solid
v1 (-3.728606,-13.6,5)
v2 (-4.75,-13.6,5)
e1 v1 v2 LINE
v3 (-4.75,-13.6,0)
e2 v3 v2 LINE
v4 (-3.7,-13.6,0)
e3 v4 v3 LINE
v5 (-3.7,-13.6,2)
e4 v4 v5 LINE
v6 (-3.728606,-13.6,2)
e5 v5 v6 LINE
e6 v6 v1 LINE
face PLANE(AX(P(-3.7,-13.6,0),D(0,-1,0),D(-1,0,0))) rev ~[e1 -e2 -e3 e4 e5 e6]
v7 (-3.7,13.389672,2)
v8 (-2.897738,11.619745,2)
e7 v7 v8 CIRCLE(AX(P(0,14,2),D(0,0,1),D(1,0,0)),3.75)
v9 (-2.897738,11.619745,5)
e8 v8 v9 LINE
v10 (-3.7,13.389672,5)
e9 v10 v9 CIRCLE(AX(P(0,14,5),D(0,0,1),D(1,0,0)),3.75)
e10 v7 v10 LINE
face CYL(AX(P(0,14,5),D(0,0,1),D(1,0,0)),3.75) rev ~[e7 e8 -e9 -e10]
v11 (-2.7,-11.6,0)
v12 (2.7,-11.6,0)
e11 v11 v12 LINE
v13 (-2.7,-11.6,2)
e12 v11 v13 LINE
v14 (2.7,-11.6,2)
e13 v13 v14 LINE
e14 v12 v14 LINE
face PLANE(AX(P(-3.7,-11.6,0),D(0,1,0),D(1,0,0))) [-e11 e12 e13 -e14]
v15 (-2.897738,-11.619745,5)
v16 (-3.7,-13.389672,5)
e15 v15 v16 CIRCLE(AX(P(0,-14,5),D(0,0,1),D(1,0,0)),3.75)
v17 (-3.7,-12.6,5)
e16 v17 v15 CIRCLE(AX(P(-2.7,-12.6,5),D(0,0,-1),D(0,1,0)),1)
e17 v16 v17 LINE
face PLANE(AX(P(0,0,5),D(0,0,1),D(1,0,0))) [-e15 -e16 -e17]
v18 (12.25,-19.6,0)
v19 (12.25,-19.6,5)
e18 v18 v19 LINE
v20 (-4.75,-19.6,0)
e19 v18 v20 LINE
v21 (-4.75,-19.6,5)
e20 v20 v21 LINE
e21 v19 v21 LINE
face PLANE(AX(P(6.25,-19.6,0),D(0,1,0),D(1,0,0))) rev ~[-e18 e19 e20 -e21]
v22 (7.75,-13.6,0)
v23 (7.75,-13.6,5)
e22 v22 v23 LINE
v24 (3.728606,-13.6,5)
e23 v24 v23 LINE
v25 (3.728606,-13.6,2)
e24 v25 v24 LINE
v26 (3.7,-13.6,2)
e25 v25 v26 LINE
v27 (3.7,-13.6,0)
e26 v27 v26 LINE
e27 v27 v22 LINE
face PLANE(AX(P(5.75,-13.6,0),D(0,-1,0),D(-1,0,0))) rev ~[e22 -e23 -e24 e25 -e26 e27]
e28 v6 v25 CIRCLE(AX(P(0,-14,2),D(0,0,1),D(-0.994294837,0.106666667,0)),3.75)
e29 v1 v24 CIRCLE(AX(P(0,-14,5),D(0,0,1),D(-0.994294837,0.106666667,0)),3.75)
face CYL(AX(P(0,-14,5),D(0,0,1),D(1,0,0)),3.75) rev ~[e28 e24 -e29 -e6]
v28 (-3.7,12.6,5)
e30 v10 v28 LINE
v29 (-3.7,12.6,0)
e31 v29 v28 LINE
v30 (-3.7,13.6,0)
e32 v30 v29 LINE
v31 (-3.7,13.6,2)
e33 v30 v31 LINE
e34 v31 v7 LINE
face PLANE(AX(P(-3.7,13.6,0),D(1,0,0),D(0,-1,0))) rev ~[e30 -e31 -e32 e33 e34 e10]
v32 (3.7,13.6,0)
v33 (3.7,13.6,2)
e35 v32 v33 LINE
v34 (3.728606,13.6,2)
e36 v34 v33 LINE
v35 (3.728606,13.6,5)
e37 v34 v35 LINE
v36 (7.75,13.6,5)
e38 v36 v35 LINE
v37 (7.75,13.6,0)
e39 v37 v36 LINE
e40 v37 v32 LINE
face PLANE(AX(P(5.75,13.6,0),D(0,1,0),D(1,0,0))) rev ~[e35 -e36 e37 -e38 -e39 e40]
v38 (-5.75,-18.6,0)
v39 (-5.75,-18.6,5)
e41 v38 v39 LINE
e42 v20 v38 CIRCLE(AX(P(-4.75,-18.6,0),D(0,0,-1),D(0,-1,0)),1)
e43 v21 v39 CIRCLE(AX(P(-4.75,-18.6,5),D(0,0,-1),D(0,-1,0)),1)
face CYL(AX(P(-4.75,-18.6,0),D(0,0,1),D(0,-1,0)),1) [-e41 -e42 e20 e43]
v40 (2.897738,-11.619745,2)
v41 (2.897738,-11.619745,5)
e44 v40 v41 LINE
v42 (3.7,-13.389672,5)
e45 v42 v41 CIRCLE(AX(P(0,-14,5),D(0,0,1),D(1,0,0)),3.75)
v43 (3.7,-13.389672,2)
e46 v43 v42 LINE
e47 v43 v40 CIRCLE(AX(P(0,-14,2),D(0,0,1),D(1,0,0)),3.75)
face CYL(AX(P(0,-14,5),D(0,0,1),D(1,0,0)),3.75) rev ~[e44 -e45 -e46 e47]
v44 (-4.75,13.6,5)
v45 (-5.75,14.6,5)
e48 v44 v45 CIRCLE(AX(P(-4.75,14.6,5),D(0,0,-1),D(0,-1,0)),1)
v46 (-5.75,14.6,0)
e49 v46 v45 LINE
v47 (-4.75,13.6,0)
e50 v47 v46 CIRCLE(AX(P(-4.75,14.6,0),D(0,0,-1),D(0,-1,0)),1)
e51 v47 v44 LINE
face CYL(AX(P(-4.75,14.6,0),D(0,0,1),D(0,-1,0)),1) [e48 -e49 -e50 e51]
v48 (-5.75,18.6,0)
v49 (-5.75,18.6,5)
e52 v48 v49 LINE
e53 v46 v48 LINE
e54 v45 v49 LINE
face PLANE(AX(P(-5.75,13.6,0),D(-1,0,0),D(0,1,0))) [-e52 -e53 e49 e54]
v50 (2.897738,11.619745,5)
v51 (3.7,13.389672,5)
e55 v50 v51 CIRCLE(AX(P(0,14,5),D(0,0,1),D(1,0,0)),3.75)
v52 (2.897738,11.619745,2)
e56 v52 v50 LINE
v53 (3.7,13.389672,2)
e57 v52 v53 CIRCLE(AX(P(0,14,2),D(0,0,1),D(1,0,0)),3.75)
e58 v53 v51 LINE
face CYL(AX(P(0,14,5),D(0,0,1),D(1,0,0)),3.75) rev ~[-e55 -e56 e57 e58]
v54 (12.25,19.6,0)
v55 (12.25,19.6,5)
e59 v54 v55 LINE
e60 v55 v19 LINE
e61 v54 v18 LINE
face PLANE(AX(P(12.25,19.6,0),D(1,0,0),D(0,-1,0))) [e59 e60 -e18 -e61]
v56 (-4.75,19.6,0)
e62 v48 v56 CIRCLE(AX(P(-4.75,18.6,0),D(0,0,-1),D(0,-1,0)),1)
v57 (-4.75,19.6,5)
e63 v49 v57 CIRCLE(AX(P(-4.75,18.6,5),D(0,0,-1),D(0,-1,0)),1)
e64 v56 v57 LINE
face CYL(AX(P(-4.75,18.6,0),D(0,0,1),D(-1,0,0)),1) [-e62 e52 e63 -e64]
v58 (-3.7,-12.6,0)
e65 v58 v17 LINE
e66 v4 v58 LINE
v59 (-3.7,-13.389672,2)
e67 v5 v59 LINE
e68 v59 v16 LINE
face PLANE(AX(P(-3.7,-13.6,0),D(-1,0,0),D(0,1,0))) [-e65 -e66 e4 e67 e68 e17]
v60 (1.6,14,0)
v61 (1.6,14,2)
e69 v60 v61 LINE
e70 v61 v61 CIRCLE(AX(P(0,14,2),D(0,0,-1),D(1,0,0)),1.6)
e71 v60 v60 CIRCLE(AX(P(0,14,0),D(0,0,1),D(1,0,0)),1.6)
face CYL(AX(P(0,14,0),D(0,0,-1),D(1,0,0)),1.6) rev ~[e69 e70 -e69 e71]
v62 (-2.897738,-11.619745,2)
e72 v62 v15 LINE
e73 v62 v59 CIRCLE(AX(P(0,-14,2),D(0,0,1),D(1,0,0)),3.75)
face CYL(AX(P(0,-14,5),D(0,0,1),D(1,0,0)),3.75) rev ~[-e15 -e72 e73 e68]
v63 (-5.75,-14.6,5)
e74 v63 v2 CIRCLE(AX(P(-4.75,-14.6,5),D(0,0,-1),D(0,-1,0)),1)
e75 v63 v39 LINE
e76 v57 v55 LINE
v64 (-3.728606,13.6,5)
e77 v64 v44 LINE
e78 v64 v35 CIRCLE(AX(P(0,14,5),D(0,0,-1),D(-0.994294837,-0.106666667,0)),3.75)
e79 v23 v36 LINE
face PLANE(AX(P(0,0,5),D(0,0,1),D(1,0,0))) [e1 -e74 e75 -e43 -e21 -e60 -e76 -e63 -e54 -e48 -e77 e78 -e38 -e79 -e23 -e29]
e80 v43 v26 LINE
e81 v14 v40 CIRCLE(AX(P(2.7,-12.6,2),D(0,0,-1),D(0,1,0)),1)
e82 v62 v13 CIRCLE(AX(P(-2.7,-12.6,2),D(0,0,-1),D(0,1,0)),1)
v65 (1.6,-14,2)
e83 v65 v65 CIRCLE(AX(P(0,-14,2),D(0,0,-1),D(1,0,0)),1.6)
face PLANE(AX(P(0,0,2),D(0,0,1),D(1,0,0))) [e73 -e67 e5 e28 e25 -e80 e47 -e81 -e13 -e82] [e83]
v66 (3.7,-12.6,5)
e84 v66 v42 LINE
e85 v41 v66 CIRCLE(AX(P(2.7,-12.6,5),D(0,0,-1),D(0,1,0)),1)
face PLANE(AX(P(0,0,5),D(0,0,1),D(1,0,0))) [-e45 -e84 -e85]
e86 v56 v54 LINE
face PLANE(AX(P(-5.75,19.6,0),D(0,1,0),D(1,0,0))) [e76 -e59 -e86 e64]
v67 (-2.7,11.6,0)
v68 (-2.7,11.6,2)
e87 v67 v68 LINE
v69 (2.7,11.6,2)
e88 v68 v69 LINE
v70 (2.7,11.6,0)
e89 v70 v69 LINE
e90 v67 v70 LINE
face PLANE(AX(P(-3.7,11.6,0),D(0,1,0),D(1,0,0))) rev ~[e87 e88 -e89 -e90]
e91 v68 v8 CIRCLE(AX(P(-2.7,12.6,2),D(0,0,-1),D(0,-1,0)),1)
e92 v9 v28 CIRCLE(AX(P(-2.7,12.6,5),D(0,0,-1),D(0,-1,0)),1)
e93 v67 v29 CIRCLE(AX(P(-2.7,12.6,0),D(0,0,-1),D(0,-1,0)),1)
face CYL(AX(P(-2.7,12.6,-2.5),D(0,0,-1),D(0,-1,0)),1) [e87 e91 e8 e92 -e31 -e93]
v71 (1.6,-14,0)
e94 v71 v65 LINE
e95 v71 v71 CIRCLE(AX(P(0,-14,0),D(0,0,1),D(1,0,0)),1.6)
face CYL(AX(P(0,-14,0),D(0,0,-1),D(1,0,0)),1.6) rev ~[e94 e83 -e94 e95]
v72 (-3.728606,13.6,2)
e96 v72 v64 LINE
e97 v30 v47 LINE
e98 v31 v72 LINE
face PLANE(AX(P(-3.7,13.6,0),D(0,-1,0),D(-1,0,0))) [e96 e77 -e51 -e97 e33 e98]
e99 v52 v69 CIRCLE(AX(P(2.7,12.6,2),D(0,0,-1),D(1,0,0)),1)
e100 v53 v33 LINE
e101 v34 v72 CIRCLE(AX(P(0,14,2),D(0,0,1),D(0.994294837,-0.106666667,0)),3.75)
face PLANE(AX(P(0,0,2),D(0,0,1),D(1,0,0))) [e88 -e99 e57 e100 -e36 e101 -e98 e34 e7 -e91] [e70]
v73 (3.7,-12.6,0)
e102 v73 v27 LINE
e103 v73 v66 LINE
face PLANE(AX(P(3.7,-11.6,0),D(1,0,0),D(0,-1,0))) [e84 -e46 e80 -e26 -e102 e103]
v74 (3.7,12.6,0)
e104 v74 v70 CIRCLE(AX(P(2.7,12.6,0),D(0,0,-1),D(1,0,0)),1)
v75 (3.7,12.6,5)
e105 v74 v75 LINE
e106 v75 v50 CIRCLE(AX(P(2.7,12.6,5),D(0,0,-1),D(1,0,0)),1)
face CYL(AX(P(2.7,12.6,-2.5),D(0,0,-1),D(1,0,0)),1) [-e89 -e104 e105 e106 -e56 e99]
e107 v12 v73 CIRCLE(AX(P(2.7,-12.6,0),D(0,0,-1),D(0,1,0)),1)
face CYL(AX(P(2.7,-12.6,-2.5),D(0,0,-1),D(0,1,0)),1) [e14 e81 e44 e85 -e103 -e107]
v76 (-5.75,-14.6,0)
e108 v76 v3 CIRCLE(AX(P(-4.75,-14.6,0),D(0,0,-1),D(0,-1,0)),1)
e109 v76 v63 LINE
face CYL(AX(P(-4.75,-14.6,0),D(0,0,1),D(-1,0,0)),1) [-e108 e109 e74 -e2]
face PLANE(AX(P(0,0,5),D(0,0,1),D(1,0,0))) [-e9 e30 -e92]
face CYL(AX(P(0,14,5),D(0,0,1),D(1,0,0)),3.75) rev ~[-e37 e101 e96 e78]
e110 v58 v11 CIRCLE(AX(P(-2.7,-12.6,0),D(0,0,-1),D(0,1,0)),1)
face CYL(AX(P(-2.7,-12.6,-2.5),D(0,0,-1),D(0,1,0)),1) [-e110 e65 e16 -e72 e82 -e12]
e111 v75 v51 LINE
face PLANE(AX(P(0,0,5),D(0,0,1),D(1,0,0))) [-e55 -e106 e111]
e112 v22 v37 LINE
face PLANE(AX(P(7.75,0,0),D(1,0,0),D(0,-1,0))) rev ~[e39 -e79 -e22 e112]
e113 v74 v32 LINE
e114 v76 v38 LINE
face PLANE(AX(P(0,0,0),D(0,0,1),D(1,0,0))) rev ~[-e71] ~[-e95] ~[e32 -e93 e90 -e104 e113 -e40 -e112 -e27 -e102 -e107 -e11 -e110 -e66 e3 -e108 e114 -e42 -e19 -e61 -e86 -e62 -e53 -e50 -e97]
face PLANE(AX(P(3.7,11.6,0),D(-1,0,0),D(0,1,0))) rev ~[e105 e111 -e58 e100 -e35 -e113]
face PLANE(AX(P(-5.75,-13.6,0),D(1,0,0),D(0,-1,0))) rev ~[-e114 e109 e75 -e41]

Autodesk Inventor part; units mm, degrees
ref_plane "YZ Plane" through (0, 0, 0) normal (1, 0, 0) x (0, 1, 0)
ref_plane "XZ Plane" through (0, 0, 0) normal (0, 1, 0) x (-1, 0, 0)
ref_plane "XY Plane" through (0, 0, 0) normal (0, 0, 1) x (1, 0, 0)
sketch "Esquisse1" plane through (0, 0, 0) normal (0, 0, 1) x (1, 0, 0)
  line L0 (-6, 11.6) -> (6, 11.6) construction
  line L1 (6, 11.6) -> (6, -11.6) construction
  line L2 (6, -11.6) -> (-6, -11.6) construction
  line L3 (-6, -11.6) -> (-6, 11.6) construction
  line L4 (-6, 11.6) -> (6, -11.6) construction
  line L5 (-6, -11.6) -> (6, 11.6) construction
  line L6 (-3.7, -11.6) -> (3.7, -11.6)
  line L7 (3.7, -11.6) -> (3.7, -13.6)
  line L8 (-3.7, -13.6) -> (-3.7, -11.6)
  line L9 (-5.75, -19.6) -> (6.25, -19.6)
  line L10 (-5.75, -13.6) -> (-5.75, -19.6)
  line L11 (5.75, -13.6) -> (3.7, -13.6)
  line L12 (-3.7, -13.6) -> (-5.75, -13.6)
  circle A0 centre (0, -14) radius 1.6
  line L13 (-3.7, -13.6) -> (0, -14) construction
  line L14 (0, -14) -> (3.7, -13.6) construction
  line L15 (-6, 0) -> (6, 0) construction
  line L16 (6, 0) -> (28.3304, 0) construction
  line L17 (7.75, 0) -> (7.75, -13.6)
  line L18 (12.25, -19.6) -> (12.25, 0)
  line L19 (5.75, -13.6) -> (7.75, -13.6)
  line L20 (6.25, -19.6) -> (12.25, -19.6)
  line L21 (6, -11.6) -> (6, 11.6) construction
  line L22 (6, 11.6) -> (-6, 11.6) construction
  line L23 (-6, 11.6) -> (-6, -11.6) construction
  line L24 (-6, -11.6) -> (6, 11.6) construction
  line L25 (-6, 11.6) -> (6, -11.6) construction
  line L26 (-3.7, 11.6) -> (3.7, 11.6)
  line L27 (3.7, 11.6) -> (3.7, 13.6)
  line L28 (-3.7, 13.6) -> (-3.7, 11.6)
  line L29 (-5.75, 19.6) -> (6.25, 19.6)
  line L30 (-5.75, 13.6) -> (-5.75, 19.6)
  line L31 (5.75, 13.6) -> (3.7, 13.6)
  line L32 (-3.7, 13.6) -> (-5.75, 13.6)
  circle A1 centre (0, 14) radius 1.6
  line L33 (-3.7, 13.6) -> (0, 14) construction
  line L34 (0, 14) -> (3.7, 13.6) construction
  line L35 (7.75, 0) -> (7.75, 13.6)
  line L36 (12.25, 19.6) -> (12.25, 0)
  line L37 (5.75, 13.6) -> (7.75, 13.6)
  line L38 (6.25, 19.6) -> (12.25, 19.6)
  point P0 (0, 0)
  point P1 (0, 0)
  point P2 (0, -11.6)
  point P3 (0, 11.6)
  dimension "d0" = 23.2
  dimension "d1" = 12
  dimension "d2" = 7.4
  dimension "d4" = 2
  dimension "d6" = 2.4
  dimension "d7" = 3.2
  dimension "d8" = 6
  dimension "d9" = 18
  dimension "d10" = 2
  dimension "d11" = 4.5
extrude "Extrusion1" add sketch "Esquisse1" along normal blind 5
sketch "Esquisse2" plane through (0, 0, 5) normal (0, 0, 1) x (1, 0, 0)
  circle A0 centre (0, 14) radius 1.6 construction
  line L0 (12.25, -19.6) -> (12.25, 19.6) construction
  line L1 (3.7, -13.6) -> (3.7, -11.6) construction
  circle A1 centre (0, 14) radius 3.75
  line L2 (12.25, 0) -> (-17.9145, 0) construction
  circle A2 centre (0, -14) radius 3.75
  point P0 (0, 0)
  dimension "d14" = 7.5
extrude "Extrusion2" cut sketch "Esquisse2" against normal blind 3
fillet "Congé1" radius 1 4 edges at (3.7, 11.6, 2.5) (-3.7, 11.6, 2.5) (3.7, -11.6, 2.5) (-3.7, -11.6, 2.5)
fillet "Congé2" radius 1 4 edges at (-5.75, 13.6, 2.5) (-5.75, 19.6, 2.5) (-5.75, -13.6, 2.5) (-5.75, -19.6, 2.5)
properties part number "FixationCorona"
